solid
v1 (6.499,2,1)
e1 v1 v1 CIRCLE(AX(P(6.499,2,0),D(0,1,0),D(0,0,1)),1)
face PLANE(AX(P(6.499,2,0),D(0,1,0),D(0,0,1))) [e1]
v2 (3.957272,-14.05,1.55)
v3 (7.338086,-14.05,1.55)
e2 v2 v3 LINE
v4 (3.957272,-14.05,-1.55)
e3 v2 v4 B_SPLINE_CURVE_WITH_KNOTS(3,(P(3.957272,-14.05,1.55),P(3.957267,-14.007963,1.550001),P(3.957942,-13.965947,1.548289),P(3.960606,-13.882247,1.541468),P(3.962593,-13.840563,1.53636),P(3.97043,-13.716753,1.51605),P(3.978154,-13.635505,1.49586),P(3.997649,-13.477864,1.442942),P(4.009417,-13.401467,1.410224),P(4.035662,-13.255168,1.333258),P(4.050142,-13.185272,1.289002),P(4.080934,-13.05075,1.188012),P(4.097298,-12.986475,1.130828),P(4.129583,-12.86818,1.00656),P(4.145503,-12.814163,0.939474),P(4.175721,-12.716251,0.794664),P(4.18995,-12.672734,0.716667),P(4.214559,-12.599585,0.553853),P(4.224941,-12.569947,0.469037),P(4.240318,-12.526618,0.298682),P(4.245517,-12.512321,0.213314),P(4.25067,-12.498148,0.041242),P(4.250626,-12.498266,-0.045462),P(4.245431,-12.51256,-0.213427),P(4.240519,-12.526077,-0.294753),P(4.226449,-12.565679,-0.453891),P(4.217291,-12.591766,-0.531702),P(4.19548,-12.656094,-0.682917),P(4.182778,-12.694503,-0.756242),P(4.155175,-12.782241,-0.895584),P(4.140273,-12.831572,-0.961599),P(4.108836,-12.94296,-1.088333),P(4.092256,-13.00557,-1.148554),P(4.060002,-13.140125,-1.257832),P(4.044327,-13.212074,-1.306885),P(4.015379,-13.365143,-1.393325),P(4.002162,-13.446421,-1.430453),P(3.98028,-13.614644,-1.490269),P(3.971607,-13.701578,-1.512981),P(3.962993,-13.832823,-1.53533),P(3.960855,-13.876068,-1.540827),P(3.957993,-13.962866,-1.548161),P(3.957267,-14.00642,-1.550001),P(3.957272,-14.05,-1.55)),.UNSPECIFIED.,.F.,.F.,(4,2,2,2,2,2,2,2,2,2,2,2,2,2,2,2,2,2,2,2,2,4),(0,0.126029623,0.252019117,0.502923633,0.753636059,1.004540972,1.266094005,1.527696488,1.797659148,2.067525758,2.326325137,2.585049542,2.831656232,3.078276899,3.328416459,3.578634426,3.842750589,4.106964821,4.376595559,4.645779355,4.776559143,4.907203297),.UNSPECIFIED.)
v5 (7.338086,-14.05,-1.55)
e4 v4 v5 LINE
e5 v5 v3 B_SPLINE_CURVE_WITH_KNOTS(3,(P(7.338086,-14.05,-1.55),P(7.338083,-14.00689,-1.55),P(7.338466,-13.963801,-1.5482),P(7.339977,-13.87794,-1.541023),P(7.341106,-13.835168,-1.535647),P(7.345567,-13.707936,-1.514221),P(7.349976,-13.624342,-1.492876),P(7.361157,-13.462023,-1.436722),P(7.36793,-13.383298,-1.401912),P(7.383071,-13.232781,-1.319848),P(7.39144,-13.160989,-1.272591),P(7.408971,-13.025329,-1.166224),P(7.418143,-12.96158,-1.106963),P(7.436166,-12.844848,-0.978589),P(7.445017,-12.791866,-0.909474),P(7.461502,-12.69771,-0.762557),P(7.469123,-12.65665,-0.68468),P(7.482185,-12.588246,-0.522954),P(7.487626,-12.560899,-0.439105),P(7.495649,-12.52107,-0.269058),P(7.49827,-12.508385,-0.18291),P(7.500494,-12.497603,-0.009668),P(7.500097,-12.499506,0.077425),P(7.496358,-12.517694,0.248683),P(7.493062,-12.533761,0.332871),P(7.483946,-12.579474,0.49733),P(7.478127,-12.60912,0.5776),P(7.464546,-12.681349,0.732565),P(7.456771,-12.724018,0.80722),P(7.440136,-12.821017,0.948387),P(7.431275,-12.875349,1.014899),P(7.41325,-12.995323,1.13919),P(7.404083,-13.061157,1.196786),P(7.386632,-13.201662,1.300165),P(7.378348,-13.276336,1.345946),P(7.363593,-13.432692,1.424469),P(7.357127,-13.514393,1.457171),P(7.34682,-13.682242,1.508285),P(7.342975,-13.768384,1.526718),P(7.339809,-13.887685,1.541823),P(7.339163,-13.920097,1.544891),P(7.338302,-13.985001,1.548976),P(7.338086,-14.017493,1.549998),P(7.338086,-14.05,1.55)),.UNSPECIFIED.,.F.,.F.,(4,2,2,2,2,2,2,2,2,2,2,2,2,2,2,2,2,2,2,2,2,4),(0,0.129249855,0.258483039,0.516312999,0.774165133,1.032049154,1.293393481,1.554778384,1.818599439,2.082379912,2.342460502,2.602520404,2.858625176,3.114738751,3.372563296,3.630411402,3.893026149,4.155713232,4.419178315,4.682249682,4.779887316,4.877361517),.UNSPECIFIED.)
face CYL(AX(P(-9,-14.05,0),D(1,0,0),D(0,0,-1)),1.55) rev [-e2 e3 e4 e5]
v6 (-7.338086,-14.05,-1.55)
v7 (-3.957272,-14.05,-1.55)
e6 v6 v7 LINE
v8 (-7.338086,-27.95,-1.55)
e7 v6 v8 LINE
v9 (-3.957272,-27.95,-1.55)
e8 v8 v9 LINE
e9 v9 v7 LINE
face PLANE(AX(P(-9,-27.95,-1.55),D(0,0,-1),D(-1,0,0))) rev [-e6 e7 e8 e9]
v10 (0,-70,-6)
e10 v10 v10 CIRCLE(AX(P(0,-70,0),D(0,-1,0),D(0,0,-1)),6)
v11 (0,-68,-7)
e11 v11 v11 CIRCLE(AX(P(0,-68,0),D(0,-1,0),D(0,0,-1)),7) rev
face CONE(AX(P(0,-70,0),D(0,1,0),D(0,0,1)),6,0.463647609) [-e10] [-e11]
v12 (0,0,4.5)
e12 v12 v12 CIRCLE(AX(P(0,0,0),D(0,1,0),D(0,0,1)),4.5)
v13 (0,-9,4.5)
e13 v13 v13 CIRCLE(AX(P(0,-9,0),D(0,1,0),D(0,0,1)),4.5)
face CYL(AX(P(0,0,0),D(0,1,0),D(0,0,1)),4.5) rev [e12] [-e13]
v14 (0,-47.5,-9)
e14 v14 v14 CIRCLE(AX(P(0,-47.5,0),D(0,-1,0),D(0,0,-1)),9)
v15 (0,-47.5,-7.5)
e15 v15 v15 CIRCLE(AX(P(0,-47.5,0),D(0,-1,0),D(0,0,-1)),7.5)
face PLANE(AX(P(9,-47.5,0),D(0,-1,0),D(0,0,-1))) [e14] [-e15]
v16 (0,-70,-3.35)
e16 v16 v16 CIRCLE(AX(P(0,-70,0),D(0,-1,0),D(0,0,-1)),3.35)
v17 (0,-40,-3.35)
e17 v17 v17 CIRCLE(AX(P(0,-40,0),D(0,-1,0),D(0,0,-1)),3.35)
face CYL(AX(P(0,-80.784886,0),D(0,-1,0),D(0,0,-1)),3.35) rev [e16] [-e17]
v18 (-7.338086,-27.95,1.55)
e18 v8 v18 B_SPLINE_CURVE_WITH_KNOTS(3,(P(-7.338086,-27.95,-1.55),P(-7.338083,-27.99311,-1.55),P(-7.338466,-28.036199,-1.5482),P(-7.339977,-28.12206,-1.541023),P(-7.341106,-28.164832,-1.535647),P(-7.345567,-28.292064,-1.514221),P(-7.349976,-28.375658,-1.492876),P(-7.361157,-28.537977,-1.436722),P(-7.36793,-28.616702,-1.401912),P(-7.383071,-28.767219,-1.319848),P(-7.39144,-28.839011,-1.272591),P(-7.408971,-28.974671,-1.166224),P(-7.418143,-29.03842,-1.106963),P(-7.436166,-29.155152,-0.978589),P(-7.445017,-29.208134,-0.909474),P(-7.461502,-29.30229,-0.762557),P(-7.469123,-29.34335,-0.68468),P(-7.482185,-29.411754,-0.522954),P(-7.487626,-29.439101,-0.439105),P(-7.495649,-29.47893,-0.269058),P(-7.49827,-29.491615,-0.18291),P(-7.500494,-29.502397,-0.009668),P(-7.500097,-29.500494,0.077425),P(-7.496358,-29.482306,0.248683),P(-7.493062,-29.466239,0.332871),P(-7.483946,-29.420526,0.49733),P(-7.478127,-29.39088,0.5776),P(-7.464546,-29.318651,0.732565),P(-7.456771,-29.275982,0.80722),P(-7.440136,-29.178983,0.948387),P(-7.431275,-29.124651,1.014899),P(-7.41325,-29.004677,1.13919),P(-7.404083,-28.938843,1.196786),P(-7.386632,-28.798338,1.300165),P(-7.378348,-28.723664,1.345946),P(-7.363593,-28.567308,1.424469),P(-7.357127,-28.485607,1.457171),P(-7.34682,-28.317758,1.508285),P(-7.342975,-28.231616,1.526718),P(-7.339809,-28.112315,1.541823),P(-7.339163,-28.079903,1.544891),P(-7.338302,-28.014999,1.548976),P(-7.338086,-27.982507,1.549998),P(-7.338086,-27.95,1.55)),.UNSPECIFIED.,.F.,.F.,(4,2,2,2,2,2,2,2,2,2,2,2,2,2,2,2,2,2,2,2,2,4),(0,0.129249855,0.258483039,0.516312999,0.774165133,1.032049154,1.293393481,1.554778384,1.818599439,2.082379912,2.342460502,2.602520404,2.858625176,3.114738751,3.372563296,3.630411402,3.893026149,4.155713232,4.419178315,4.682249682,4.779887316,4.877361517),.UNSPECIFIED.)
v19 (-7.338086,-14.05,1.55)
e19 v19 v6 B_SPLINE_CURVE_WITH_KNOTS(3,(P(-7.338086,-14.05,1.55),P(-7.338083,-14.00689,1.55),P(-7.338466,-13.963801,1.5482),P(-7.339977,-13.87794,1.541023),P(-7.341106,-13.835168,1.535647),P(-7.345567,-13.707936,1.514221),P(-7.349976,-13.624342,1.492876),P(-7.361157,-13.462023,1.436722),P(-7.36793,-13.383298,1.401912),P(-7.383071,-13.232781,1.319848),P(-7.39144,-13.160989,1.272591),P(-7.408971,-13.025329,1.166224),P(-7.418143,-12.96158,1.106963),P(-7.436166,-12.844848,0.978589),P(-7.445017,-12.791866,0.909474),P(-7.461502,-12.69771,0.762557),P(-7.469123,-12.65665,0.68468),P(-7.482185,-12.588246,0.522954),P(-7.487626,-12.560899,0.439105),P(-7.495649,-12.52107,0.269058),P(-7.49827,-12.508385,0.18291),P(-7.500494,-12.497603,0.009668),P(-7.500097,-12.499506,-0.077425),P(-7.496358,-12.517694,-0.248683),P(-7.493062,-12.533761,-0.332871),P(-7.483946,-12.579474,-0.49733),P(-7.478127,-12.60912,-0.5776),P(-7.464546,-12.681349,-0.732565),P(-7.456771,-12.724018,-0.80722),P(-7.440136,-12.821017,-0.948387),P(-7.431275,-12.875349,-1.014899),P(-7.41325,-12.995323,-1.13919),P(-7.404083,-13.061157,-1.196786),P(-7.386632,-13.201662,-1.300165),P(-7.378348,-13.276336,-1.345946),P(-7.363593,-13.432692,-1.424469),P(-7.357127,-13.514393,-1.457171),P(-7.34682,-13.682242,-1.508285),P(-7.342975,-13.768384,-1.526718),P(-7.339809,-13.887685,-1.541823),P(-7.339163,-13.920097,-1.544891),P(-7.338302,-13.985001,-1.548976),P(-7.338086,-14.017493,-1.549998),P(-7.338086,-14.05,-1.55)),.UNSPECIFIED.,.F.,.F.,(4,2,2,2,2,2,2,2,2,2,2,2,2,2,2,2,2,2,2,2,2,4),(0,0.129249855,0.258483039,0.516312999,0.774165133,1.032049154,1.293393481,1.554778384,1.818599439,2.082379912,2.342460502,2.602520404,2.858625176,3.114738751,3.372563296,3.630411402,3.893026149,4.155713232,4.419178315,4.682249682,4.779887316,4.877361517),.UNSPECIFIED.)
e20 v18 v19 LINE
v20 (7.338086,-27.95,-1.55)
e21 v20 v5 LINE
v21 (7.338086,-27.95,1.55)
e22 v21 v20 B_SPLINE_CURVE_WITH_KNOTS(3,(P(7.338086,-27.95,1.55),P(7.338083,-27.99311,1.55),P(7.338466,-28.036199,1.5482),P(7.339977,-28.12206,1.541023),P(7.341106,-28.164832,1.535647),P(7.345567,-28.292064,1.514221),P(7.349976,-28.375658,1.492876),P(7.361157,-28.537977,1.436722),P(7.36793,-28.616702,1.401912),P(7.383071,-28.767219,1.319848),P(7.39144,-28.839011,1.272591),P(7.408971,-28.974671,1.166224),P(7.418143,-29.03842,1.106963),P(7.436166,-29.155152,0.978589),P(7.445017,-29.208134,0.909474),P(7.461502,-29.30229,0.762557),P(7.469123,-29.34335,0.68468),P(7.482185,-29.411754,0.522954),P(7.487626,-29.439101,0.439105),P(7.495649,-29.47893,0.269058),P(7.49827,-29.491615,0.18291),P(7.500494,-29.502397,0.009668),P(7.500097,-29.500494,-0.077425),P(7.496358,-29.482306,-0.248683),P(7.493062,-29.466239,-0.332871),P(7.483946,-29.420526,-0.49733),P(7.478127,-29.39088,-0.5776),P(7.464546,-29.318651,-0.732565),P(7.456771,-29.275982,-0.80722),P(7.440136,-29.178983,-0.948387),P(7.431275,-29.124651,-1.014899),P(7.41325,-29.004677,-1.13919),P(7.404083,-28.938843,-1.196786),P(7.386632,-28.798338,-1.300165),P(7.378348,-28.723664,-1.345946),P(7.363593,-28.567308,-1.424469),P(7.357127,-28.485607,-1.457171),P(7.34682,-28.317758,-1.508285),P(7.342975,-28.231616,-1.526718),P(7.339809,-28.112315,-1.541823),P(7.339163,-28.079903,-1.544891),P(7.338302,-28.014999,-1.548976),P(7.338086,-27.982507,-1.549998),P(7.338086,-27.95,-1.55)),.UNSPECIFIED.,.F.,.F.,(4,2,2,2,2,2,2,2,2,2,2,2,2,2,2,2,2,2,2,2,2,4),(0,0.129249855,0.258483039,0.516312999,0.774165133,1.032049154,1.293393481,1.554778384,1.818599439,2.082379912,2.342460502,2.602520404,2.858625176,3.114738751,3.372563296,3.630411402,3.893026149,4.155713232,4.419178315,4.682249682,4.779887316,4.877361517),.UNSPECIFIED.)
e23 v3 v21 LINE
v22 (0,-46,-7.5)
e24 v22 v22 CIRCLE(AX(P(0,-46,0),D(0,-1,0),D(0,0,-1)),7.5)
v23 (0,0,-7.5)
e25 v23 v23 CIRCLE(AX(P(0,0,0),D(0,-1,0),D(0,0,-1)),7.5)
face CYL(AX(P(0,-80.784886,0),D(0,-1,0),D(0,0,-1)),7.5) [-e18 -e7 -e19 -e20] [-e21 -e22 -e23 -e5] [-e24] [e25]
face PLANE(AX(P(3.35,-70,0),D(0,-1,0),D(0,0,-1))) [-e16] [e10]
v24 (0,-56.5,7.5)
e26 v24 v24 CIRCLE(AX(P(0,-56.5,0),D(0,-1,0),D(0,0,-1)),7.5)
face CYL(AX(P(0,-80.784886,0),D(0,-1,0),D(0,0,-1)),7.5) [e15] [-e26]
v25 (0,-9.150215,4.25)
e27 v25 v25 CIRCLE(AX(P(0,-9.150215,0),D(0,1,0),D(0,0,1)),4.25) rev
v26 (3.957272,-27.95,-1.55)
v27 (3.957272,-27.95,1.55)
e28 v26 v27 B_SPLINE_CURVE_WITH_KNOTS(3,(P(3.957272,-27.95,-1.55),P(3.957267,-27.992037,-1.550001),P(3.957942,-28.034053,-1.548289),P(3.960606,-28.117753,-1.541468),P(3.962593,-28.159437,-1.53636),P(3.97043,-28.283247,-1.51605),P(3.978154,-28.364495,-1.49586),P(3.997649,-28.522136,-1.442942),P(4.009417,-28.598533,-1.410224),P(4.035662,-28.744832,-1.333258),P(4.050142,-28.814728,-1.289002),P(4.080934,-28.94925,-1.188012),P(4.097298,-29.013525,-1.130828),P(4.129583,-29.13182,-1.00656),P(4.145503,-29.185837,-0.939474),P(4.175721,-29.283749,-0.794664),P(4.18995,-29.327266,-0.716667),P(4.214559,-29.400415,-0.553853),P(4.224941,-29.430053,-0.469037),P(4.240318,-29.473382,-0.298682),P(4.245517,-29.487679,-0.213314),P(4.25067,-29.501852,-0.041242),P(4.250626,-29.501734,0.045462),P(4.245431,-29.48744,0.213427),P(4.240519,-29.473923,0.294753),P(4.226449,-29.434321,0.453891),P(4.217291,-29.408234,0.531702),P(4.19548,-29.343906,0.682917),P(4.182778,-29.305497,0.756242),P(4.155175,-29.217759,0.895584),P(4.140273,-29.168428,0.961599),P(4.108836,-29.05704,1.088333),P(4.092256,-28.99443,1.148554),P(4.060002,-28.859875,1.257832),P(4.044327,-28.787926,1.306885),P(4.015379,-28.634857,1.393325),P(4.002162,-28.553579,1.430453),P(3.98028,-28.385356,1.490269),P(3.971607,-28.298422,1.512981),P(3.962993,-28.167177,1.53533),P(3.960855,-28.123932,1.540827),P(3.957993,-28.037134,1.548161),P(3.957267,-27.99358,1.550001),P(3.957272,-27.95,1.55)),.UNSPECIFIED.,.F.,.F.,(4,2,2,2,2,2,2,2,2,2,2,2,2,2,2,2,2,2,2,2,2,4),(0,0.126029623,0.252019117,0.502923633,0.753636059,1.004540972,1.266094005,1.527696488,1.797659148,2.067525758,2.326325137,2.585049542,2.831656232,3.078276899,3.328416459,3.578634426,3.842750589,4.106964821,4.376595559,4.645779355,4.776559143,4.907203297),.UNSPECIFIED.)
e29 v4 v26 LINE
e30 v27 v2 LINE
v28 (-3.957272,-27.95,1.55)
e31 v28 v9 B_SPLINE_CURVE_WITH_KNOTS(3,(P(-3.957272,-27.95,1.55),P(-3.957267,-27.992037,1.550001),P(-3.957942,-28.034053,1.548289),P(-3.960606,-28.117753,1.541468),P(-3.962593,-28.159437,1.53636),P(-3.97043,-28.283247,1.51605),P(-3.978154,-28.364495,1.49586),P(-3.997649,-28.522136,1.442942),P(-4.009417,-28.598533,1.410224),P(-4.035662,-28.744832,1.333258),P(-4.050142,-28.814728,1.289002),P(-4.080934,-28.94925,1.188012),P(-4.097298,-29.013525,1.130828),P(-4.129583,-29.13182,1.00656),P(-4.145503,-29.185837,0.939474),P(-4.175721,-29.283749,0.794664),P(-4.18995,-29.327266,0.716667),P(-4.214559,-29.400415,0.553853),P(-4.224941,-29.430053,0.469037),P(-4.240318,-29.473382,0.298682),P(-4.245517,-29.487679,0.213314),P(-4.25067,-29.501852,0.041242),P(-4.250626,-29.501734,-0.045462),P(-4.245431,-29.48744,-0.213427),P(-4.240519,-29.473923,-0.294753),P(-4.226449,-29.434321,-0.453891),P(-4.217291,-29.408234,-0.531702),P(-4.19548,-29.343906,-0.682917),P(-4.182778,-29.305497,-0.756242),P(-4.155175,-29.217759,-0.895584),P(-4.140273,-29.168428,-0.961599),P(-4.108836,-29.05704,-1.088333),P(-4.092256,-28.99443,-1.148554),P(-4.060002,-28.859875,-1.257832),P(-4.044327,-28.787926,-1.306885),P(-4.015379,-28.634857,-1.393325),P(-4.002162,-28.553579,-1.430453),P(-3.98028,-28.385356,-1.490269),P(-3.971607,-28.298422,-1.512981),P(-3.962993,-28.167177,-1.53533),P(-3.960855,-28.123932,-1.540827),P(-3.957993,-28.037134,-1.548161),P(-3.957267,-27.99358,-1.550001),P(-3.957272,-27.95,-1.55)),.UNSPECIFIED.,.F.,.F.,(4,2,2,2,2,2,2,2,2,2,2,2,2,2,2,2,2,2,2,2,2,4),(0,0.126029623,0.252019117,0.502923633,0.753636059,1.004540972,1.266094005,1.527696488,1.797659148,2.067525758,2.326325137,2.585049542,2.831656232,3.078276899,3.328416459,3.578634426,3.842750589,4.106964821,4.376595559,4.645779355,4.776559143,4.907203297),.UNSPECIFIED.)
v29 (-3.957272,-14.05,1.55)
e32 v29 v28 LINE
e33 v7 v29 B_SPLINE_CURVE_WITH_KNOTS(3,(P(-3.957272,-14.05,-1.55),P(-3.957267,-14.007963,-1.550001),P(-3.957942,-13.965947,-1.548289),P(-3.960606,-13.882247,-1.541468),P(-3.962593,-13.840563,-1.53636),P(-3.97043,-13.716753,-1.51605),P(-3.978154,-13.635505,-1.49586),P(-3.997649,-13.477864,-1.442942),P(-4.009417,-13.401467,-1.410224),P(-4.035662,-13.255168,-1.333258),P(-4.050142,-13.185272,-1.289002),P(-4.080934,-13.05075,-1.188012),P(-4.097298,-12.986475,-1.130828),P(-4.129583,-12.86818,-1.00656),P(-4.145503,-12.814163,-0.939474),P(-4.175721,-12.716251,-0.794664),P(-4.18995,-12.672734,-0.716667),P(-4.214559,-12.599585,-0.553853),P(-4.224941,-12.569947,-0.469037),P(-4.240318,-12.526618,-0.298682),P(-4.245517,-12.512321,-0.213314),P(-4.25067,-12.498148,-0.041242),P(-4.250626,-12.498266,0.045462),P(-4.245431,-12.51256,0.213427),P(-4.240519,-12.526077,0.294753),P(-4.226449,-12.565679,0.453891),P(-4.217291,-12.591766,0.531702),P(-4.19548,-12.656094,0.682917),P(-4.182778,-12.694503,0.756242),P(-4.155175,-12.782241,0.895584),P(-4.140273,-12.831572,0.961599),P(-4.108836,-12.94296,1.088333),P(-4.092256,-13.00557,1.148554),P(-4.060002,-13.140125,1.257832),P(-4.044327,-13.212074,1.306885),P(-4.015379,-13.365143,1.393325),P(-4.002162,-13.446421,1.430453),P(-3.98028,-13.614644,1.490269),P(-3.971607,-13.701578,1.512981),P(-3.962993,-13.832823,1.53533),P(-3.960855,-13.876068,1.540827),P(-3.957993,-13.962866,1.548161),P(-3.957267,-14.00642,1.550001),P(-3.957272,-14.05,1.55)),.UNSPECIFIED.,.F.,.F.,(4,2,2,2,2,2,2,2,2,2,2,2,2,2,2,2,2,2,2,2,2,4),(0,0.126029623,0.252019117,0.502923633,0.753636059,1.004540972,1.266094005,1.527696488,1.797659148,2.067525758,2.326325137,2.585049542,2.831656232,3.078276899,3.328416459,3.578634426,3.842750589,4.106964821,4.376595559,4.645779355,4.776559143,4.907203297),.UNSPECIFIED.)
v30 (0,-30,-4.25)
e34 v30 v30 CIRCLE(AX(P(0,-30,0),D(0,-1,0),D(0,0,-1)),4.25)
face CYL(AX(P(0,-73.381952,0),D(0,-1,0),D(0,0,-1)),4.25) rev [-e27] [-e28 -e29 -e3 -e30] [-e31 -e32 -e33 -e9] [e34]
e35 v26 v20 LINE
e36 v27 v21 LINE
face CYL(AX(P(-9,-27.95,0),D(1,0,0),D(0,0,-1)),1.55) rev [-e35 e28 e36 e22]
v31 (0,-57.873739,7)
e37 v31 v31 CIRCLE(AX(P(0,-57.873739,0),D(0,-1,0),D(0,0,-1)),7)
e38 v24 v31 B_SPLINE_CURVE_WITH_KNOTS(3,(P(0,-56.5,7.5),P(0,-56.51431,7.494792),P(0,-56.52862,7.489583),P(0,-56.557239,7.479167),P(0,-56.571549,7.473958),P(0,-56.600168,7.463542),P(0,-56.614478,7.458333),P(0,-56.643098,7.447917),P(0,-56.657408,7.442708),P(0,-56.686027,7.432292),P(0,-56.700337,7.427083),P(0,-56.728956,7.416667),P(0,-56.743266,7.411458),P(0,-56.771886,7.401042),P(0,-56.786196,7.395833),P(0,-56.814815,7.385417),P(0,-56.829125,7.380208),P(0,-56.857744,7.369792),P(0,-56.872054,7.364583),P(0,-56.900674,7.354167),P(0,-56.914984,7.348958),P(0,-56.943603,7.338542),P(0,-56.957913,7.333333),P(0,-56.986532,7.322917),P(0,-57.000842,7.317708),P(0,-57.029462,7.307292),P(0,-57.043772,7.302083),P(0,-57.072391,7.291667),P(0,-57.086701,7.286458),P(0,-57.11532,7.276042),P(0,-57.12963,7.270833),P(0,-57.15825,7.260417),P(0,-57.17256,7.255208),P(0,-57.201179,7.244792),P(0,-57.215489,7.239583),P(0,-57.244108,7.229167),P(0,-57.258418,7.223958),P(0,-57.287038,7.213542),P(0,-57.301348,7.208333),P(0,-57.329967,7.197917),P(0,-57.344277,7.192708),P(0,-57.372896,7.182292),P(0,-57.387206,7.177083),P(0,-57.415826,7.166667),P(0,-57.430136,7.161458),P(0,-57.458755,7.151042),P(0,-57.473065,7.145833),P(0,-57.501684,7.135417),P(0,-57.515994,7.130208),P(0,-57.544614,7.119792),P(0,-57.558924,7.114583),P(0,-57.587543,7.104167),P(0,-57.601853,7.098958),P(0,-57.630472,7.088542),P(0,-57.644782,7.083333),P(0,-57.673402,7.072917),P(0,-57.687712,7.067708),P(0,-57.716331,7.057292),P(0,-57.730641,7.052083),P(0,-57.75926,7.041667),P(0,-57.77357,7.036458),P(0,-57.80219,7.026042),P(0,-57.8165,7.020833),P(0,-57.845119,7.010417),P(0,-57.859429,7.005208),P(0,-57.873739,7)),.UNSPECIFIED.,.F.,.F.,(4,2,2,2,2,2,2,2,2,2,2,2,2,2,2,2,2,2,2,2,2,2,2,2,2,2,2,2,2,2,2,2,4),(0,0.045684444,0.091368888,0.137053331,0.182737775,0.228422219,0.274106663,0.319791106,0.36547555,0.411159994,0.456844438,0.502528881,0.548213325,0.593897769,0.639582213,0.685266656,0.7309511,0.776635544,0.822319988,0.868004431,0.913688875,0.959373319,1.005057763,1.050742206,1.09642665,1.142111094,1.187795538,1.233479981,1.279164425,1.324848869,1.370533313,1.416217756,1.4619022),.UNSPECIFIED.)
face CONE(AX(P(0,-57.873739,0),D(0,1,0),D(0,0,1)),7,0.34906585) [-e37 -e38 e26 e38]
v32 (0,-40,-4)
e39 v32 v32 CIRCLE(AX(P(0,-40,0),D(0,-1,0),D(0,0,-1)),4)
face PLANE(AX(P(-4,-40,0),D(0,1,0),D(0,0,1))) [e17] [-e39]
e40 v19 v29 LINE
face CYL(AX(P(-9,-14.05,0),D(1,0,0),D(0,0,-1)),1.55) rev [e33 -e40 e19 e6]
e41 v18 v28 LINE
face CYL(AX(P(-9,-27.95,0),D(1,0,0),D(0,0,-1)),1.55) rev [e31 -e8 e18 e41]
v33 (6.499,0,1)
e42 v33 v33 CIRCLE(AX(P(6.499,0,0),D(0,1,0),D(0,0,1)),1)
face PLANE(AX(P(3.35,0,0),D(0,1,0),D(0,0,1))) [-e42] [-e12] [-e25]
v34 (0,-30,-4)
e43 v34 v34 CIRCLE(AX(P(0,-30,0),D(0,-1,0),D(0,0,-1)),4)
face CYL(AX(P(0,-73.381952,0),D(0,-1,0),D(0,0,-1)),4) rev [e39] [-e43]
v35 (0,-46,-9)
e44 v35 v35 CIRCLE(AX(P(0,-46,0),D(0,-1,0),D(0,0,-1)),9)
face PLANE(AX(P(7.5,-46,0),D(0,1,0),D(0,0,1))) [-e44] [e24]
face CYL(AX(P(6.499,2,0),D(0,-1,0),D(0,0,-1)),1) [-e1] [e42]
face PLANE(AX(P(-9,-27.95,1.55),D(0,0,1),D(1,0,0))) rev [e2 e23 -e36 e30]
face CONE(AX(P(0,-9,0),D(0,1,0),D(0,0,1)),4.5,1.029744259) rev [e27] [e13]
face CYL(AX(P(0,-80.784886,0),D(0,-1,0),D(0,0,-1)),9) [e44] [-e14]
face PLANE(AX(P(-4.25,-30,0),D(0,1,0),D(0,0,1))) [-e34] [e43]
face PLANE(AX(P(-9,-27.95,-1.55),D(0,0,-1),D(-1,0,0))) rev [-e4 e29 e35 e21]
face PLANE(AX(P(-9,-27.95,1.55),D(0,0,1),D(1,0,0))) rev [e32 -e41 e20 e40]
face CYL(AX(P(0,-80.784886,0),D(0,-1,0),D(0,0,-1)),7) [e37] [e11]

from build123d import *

# Parameters (mm, degrees)
SKETCH6_R                  = 1
BOSS_EXTRUDE1_DEPTH        = 2
CUT_EXTRUDE1_DEPTH         = 72.147733625
CUT_EXTRUDE1_DEPTH_BACK    = 72.147733625
M10X1_0_TAPPED_HOLE1_D     = 9
M10X1_0_TAPPED_HOLE1_DEPTH = 9
M10X1_0_TAPPED_HOLE1_TIP   = 2.703872786
CHAMFER1_SIZE              = 2
CHAMFER1_SIZE2             = 1
CHAMFER2_SIZE2             = 0.5
CHAMFER2_SIZE              = 1.37373871


with BuildPart() as part:
    # Sketch1 → Revolve1 (revolve)
    with BuildSketch(Plane.XY, mode=Mode.PRIVATE) as revolve1_sk:
        Polygon((7.5, 0), (7.5, -46), (9, -46), (9, -47.5), (7.5, -47.5), (7.5, -56.5), (7, -56.5), (7, -70), (3.35, -70), (3.35, 0), align=None)
    revolve(revolve1_sk.sketch.rotate(Axis((0, -80.784886464, 0), (0, 1, 0)), 90), axis=Axis((0, -80.784886464, 0), (0, 1, 0)))

    # Sketch6 → Boss-Extrude1 (add)
    with BuildSketch(Plane(origin=(0, 0, 0), x_dir=(1, 0, 0), z_dir=(0, 1, 0))):
        with Locations(Location((6.499, 0, 0), (0, 0, 270))):
            Circle(SKETCH6_R)
    extrude(amount=BOSS_EXTRUDE1_DEPTH)

    # Sketch2 → Cut-Revolve1 (revolve, cut)
    with BuildSketch(Plane.XY, mode=Mode.PRIVATE) as cut_revolve1_sk:
        Polygon((-3.35, 0), (-4.25, 0), (-4.25, -30), (-4, -30), (-4, -40), (-3.35, -40), align=None)
    revolve(cut_revolve1_sk.sketch.rotate(Axis((0, -73.381951652, 0), (0, 1, 0)), 270), axis=Axis((0, -73.381951652, 0), (0, 1, 0)), mode=Mode.SUBTRACT)

    # Sketch3 → Cut-Extrude1 (cut, two sides: drawn at the far end of the back side and taken through both)
    with BuildSketch(Plane(origin=(0, 0, 0), x_dir=(0, 0, -1), z_dir=(1, 0, 0)).offset(-CUT_EXTRUDE1_DEPTH_BACK)):
        with BuildLine():
            Line((-1.55, -27.95), (-1.55, -14.05))
            ThreePointArc((-1.55, -14.05), (0, -12.5), (1.55, -14.05))
            Line((1.55, -14.05), (1.55, -27.95))
            ThreePointArc((1.55, -27.95), (0, -29.5), (-1.55, -27.95))
        make_face()
    extrude(amount=CUT_EXTRUDE1_DEPTH + CUT_EXTRUDE1_DEPTH_BACK, mode=Mode.SUBTRACT)

    # M10x1.0 Tapped Hole1
    with Locations(Plane(origin=(0, 0, 0), x_dir=(-1, 0, 0), z_dir=(0, 1, 0))):
        with Locations((0, 0)):
            Hole(M10X1_0_TAPPED_HOLE1_D / 2, depth=M10X1_0_TAPPED_HOLE1_DEPTH)
            with Locations((0, 0, -(M10X1_0_TAPPED_HOLE1_DEPTH + M10X1_0_TAPPED_HOLE1_TIP / 2))):  # 118° drill point
                Cone(0, M10X1_0_TAPPED_HOLE1_D / 2, M10X1_0_TAPPED_HOLE1_TIP, mode=Mode.SUBTRACT)

    # Chamfer1
    chamfer1_edges = [part.edges().sort_by_distance(p)[0] for p in [
        (0, -70, 7),
    ]]
    chamfer1_side = [part.faces().sort_by_distance(p)[0] for p in [
        (0, -63.25, 7),
    ]]
    chamfer(chamfer1_edges, length=CHAMFER1_SIZE, length2=CHAMFER1_SIZE2, reference=chamfer1_side[0])

    # Chamfer2
    chamfer2_edges = [part.edges().sort_by_distance(p)[0] for p in [
        (0, -56.5, 7),
    ]]
    chamfer2_side = [part.faces().sort_by_distance(p)[0] for p in [
        (0, -56.51, 7),
    ]]
    chamfer(chamfer2_edges, length=CHAMFER2_SIZE - 0.0001, length2=CHAMFER2_SIZE2 - 0.0001, reference=chamfer2_side[0])  # a hair under: the kernel refuses the full size


solid = part.part
